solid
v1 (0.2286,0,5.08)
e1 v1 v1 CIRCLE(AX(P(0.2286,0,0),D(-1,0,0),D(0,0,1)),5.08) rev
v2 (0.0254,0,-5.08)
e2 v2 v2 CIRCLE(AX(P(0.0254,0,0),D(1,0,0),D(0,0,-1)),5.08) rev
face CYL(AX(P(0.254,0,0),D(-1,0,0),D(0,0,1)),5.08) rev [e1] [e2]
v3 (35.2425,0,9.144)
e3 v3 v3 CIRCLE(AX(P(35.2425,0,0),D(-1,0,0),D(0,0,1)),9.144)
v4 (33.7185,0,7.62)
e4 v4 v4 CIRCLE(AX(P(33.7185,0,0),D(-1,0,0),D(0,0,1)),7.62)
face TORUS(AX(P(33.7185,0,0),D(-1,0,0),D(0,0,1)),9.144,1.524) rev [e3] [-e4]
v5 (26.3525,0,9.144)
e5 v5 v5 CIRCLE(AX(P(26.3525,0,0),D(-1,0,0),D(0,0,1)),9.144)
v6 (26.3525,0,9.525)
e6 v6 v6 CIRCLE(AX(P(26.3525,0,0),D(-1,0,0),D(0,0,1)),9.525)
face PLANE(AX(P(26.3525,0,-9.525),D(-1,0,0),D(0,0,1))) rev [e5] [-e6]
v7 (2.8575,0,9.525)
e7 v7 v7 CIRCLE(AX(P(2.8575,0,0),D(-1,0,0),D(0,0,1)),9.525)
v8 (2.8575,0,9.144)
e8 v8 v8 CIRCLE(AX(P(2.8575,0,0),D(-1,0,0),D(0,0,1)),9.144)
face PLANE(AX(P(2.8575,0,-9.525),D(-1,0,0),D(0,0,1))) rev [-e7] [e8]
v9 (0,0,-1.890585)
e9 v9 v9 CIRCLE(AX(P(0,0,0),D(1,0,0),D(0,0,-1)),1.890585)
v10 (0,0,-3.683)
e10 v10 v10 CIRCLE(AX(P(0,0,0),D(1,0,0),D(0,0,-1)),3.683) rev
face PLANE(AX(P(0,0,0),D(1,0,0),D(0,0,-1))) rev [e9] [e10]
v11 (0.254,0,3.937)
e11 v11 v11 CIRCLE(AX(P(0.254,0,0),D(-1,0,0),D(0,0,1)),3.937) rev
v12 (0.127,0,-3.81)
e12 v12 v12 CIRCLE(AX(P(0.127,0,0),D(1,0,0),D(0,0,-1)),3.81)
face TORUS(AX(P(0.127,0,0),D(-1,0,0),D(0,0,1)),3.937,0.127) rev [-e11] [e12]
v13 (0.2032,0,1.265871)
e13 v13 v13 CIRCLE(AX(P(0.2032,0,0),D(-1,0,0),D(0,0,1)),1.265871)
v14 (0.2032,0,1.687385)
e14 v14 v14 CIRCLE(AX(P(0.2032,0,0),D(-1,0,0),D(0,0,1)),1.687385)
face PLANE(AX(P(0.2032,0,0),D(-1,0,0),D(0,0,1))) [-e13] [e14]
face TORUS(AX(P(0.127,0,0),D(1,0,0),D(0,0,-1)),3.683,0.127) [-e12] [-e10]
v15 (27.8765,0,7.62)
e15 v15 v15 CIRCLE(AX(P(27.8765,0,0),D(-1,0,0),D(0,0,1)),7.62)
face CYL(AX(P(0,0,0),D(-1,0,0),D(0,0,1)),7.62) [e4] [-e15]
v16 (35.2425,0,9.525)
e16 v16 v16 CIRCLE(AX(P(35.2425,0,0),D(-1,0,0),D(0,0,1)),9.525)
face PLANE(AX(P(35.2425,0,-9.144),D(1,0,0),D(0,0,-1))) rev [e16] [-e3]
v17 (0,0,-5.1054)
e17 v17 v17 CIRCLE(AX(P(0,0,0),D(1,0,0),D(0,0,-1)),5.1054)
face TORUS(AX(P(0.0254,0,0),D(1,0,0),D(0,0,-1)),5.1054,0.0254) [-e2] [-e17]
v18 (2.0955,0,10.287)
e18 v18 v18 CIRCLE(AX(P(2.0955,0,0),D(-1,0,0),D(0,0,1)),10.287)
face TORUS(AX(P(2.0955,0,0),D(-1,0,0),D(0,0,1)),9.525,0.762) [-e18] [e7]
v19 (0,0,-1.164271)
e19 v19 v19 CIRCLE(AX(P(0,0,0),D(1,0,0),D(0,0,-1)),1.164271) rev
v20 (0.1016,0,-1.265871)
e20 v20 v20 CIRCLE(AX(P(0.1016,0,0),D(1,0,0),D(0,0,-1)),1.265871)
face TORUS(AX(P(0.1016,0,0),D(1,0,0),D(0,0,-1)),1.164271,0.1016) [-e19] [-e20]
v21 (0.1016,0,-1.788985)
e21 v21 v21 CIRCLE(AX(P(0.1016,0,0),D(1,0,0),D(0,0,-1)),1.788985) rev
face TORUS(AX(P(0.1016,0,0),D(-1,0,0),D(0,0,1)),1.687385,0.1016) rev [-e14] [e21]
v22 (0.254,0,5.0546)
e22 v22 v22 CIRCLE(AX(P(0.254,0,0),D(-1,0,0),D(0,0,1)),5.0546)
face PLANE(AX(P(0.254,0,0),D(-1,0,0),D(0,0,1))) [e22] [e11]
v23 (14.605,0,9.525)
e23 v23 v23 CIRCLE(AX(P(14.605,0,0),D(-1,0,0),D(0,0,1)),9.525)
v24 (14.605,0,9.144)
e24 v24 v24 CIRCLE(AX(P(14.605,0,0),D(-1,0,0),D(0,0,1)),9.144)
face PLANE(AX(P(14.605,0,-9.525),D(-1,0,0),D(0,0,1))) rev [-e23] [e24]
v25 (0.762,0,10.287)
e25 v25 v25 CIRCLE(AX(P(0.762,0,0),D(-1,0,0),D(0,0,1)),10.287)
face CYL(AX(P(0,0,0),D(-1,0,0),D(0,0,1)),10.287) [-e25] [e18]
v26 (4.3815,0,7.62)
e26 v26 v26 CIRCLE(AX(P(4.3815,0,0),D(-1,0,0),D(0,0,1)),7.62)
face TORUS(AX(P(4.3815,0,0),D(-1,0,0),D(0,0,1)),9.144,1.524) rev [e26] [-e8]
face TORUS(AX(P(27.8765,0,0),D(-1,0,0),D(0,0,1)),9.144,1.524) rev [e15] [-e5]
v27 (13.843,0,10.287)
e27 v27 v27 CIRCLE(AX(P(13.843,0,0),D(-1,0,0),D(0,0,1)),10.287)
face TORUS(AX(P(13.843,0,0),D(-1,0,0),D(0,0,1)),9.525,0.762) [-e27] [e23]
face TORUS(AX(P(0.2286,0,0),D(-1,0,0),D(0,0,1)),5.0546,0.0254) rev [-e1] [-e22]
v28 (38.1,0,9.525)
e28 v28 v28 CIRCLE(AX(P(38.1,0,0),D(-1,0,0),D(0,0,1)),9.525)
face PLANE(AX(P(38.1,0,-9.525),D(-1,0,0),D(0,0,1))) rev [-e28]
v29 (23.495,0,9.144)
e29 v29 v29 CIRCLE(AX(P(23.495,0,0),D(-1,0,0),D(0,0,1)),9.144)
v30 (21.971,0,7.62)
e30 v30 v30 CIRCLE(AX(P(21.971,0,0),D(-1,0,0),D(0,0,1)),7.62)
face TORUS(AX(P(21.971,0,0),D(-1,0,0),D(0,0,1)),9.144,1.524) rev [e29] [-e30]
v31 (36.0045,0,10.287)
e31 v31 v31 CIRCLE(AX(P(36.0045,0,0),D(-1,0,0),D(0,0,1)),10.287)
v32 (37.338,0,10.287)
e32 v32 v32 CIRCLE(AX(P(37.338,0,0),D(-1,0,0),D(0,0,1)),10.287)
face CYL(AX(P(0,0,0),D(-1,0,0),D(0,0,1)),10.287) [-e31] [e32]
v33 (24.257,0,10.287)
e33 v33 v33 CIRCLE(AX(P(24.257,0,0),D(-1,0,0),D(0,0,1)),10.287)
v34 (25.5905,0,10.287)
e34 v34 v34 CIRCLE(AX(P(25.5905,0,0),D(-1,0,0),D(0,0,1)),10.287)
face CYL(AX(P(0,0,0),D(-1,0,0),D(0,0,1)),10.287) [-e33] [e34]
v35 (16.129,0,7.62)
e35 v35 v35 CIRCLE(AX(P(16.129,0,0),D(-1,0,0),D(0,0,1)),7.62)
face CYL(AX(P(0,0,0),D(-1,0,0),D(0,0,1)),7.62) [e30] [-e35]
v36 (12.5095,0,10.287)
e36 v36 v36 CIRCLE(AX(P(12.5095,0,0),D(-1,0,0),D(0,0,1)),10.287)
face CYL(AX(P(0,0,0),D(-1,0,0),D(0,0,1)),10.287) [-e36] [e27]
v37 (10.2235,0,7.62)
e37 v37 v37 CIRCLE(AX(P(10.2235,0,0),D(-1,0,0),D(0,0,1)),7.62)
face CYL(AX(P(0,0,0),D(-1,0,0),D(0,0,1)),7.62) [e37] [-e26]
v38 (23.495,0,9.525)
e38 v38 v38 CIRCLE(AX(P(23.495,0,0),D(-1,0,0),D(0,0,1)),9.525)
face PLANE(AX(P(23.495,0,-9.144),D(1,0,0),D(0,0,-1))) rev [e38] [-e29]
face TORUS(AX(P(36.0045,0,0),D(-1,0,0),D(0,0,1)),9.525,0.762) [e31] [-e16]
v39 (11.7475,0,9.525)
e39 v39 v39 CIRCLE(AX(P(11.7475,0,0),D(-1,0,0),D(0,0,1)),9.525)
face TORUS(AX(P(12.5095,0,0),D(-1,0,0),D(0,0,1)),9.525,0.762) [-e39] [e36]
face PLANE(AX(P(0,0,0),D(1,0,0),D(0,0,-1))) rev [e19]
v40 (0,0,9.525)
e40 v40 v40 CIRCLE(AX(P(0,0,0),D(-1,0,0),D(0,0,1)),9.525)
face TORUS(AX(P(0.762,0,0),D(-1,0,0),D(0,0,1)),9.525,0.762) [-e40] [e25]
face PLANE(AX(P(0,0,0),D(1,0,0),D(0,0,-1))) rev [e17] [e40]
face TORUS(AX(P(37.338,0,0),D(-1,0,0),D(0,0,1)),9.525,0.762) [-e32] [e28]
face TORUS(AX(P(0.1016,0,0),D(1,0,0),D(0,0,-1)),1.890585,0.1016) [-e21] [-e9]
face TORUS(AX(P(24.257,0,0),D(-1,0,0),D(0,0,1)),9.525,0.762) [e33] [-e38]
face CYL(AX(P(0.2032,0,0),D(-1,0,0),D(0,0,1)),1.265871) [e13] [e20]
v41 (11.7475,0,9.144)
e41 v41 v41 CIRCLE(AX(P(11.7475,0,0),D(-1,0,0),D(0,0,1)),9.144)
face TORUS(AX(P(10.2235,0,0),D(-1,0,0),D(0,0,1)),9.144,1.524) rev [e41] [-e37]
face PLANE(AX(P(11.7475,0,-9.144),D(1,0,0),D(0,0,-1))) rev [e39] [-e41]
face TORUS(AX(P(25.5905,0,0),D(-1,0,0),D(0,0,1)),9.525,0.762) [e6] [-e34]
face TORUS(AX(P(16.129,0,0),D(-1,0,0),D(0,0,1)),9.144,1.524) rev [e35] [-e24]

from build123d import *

# Parameters (mm, degrees)
SKETCH3_R          = 5.08
SKETCH3_R_2        = 3.81
CUT_EXTRUDE1_DEPTH = 0.254
SKETCH4_R          = 1.788985249
SKETCH4_R_2        = 1.265871179
CUT_EXTRUDE2_DEPTH = 0.2032
FILLET1_R          = 0.0254
FILLET3_R          = 0.1016
FILLET5_R          = 0.127


with BuildPart() as part:
    # Sketch1 → Revolve1 (revolve)
    with BuildSketch(Plane(origin=(0, 0, 0), x_dir=(1, 0, 0), z_dir=(0, 1, 0)), mode=Mode.PRIVATE) as revolve1_sk:
        with BuildLine():
            Line((0.762, 10.287), (2.0955, 10.287))
            ThreePointArc((2.0955, 10.287), (2.634315367, 10.063815367), (2.8575, 9.525))
            Line((2.8575, 9.525), (2.8575, 9.144))
            ThreePointArc((2.8575, 9.144), (3.303869265, 8.066369265), (4.3815, 7.62))
            Line((4.3815, 7.62), (10.2235, 7.62))
            ThreePointArc((10.2235, 7.62), (11.301130735, 8.066369265), (11.7475, 9.144))
            Line((11.7475, 9.144), (11.7475, 9.525))
            ThreePointArc((11.7475, 9.525), (11.970684633, 10.063815367), (12.5095, 10.287))
            Line((12.5095, 10.287), (13.843, 10.287))
            ThreePointArc((13.843, 10.287), (14.381815367, 10.063815367), (14.605, 9.525))
            Line((14.605, 9.525), (14.605, 9.144))
            ThreePointArc((14.605, 9.144), (15.051369265, 8.066369265), (16.129, 7.62))
            Line((16.129, 7.62), (21.971, 7.62))
            ThreePointArc((21.971, 7.62), (23.048630735, 8.066369265), (23.495, 9.144))
            Line((23.495, 9.144), (23.495, 9.525))
            ThreePointArc((23.495, 9.525), (23.718184633, 10.063815367), (24.257, 10.287))
            Line((24.257, 10.287), (25.5905, 10.287))
            ThreePointArc((25.5905, 10.287), (26.129315367, 10.063815367), (26.3525, 9.525))
            Line((26.3525, 9.525), (26.3525, 9.144))
            ThreePointArc((26.3525, 9.144), (26.798869265, 8.066369265), (27.8765, 7.62))
            Line((27.8765, 7.62), (33.7185, 7.62))
            ThreePointArc((33.7185, 7.62), (34.796130735, 8.066369265), (35.2425, 9.144))
            Line((35.2425, 9.144), (35.2425, 9.525))
            ThreePointArc((35.2425, 9.525), (35.465684633, 10.063815367), (36.0045, 10.287))
            Line((36.0045, 10.287), (37.338, 10.287))
            ThreePointArc((37.338, 10.287), (37.876815367, 10.063815367), (38.1, 9.525))
            Line((38.1, 9.525), (38.1, 0))
            Line((38.1, 0), (0, 0))
            Line((0, 0), (0, 9.525))
            ThreePointArc((0, 9.525), (0.223184633, 10.063815367), (0.762, 10.287))
        make_face()
    revolve(revolve1_sk.sketch.rotate(Axis((0, 0, 0), (1, 0, 0)), 180), axis=Axis((0, 0, 0), (1, 0, 0)))

    # Sketch3 → Cut-Extrude1 (cut)
    with BuildSketch(Plane.ZY):
        Circle(SKETCH3_R)
        Circle(SKETCH3_R_2, mode=Mode.SUBTRACT)
    extrude(amount=-CUT_EXTRUDE1_DEPTH, mode=Mode.SUBTRACT)

    # Sketch4 → Cut-Extrude2 (cut)
    with BuildSketch(Plane.ZY):
        Circle(SKETCH4_R)
        Circle(SKETCH4_R_2, mode=Mode.SUBTRACT)
    extrude(amount=-CUT_EXTRUDE2_DEPTH, mode=Mode.SUBTRACT)

    # Fillet1
    fillet1_edges = [part.edges().sort_by_distance(p)[0] for p in [
        (0.254, 0, -5.08),
        (0, 0, -5.08),
    ]]
    fillet(fillet1_edges, radius=FILLET1_R)

    # Fillet3
    fillet3_edges = [part.edges().sort_by_distance(p)[0] for p in [
        (0.2032, 0, -1.788985249),
        (0, 0, -1.788985249),
        (0, 0, -1.265871179),
    ]]
    fillet(fillet3_edges, radius=FILLET3_R - 0.0001)  # a hair under: the kernel refuses the full size

    # Fillet5
    fillet5_edges = [part.edges().sort_by_distance(p)[0] for p in [
        (0.254, 0, -3.81),
        (0, 0, -3.81),
    ]]
    fillet(fillet5_edges, radius=FILLET5_R - 0.0001)  # a hair under: the kernel refuses the full size


solid = part.part
